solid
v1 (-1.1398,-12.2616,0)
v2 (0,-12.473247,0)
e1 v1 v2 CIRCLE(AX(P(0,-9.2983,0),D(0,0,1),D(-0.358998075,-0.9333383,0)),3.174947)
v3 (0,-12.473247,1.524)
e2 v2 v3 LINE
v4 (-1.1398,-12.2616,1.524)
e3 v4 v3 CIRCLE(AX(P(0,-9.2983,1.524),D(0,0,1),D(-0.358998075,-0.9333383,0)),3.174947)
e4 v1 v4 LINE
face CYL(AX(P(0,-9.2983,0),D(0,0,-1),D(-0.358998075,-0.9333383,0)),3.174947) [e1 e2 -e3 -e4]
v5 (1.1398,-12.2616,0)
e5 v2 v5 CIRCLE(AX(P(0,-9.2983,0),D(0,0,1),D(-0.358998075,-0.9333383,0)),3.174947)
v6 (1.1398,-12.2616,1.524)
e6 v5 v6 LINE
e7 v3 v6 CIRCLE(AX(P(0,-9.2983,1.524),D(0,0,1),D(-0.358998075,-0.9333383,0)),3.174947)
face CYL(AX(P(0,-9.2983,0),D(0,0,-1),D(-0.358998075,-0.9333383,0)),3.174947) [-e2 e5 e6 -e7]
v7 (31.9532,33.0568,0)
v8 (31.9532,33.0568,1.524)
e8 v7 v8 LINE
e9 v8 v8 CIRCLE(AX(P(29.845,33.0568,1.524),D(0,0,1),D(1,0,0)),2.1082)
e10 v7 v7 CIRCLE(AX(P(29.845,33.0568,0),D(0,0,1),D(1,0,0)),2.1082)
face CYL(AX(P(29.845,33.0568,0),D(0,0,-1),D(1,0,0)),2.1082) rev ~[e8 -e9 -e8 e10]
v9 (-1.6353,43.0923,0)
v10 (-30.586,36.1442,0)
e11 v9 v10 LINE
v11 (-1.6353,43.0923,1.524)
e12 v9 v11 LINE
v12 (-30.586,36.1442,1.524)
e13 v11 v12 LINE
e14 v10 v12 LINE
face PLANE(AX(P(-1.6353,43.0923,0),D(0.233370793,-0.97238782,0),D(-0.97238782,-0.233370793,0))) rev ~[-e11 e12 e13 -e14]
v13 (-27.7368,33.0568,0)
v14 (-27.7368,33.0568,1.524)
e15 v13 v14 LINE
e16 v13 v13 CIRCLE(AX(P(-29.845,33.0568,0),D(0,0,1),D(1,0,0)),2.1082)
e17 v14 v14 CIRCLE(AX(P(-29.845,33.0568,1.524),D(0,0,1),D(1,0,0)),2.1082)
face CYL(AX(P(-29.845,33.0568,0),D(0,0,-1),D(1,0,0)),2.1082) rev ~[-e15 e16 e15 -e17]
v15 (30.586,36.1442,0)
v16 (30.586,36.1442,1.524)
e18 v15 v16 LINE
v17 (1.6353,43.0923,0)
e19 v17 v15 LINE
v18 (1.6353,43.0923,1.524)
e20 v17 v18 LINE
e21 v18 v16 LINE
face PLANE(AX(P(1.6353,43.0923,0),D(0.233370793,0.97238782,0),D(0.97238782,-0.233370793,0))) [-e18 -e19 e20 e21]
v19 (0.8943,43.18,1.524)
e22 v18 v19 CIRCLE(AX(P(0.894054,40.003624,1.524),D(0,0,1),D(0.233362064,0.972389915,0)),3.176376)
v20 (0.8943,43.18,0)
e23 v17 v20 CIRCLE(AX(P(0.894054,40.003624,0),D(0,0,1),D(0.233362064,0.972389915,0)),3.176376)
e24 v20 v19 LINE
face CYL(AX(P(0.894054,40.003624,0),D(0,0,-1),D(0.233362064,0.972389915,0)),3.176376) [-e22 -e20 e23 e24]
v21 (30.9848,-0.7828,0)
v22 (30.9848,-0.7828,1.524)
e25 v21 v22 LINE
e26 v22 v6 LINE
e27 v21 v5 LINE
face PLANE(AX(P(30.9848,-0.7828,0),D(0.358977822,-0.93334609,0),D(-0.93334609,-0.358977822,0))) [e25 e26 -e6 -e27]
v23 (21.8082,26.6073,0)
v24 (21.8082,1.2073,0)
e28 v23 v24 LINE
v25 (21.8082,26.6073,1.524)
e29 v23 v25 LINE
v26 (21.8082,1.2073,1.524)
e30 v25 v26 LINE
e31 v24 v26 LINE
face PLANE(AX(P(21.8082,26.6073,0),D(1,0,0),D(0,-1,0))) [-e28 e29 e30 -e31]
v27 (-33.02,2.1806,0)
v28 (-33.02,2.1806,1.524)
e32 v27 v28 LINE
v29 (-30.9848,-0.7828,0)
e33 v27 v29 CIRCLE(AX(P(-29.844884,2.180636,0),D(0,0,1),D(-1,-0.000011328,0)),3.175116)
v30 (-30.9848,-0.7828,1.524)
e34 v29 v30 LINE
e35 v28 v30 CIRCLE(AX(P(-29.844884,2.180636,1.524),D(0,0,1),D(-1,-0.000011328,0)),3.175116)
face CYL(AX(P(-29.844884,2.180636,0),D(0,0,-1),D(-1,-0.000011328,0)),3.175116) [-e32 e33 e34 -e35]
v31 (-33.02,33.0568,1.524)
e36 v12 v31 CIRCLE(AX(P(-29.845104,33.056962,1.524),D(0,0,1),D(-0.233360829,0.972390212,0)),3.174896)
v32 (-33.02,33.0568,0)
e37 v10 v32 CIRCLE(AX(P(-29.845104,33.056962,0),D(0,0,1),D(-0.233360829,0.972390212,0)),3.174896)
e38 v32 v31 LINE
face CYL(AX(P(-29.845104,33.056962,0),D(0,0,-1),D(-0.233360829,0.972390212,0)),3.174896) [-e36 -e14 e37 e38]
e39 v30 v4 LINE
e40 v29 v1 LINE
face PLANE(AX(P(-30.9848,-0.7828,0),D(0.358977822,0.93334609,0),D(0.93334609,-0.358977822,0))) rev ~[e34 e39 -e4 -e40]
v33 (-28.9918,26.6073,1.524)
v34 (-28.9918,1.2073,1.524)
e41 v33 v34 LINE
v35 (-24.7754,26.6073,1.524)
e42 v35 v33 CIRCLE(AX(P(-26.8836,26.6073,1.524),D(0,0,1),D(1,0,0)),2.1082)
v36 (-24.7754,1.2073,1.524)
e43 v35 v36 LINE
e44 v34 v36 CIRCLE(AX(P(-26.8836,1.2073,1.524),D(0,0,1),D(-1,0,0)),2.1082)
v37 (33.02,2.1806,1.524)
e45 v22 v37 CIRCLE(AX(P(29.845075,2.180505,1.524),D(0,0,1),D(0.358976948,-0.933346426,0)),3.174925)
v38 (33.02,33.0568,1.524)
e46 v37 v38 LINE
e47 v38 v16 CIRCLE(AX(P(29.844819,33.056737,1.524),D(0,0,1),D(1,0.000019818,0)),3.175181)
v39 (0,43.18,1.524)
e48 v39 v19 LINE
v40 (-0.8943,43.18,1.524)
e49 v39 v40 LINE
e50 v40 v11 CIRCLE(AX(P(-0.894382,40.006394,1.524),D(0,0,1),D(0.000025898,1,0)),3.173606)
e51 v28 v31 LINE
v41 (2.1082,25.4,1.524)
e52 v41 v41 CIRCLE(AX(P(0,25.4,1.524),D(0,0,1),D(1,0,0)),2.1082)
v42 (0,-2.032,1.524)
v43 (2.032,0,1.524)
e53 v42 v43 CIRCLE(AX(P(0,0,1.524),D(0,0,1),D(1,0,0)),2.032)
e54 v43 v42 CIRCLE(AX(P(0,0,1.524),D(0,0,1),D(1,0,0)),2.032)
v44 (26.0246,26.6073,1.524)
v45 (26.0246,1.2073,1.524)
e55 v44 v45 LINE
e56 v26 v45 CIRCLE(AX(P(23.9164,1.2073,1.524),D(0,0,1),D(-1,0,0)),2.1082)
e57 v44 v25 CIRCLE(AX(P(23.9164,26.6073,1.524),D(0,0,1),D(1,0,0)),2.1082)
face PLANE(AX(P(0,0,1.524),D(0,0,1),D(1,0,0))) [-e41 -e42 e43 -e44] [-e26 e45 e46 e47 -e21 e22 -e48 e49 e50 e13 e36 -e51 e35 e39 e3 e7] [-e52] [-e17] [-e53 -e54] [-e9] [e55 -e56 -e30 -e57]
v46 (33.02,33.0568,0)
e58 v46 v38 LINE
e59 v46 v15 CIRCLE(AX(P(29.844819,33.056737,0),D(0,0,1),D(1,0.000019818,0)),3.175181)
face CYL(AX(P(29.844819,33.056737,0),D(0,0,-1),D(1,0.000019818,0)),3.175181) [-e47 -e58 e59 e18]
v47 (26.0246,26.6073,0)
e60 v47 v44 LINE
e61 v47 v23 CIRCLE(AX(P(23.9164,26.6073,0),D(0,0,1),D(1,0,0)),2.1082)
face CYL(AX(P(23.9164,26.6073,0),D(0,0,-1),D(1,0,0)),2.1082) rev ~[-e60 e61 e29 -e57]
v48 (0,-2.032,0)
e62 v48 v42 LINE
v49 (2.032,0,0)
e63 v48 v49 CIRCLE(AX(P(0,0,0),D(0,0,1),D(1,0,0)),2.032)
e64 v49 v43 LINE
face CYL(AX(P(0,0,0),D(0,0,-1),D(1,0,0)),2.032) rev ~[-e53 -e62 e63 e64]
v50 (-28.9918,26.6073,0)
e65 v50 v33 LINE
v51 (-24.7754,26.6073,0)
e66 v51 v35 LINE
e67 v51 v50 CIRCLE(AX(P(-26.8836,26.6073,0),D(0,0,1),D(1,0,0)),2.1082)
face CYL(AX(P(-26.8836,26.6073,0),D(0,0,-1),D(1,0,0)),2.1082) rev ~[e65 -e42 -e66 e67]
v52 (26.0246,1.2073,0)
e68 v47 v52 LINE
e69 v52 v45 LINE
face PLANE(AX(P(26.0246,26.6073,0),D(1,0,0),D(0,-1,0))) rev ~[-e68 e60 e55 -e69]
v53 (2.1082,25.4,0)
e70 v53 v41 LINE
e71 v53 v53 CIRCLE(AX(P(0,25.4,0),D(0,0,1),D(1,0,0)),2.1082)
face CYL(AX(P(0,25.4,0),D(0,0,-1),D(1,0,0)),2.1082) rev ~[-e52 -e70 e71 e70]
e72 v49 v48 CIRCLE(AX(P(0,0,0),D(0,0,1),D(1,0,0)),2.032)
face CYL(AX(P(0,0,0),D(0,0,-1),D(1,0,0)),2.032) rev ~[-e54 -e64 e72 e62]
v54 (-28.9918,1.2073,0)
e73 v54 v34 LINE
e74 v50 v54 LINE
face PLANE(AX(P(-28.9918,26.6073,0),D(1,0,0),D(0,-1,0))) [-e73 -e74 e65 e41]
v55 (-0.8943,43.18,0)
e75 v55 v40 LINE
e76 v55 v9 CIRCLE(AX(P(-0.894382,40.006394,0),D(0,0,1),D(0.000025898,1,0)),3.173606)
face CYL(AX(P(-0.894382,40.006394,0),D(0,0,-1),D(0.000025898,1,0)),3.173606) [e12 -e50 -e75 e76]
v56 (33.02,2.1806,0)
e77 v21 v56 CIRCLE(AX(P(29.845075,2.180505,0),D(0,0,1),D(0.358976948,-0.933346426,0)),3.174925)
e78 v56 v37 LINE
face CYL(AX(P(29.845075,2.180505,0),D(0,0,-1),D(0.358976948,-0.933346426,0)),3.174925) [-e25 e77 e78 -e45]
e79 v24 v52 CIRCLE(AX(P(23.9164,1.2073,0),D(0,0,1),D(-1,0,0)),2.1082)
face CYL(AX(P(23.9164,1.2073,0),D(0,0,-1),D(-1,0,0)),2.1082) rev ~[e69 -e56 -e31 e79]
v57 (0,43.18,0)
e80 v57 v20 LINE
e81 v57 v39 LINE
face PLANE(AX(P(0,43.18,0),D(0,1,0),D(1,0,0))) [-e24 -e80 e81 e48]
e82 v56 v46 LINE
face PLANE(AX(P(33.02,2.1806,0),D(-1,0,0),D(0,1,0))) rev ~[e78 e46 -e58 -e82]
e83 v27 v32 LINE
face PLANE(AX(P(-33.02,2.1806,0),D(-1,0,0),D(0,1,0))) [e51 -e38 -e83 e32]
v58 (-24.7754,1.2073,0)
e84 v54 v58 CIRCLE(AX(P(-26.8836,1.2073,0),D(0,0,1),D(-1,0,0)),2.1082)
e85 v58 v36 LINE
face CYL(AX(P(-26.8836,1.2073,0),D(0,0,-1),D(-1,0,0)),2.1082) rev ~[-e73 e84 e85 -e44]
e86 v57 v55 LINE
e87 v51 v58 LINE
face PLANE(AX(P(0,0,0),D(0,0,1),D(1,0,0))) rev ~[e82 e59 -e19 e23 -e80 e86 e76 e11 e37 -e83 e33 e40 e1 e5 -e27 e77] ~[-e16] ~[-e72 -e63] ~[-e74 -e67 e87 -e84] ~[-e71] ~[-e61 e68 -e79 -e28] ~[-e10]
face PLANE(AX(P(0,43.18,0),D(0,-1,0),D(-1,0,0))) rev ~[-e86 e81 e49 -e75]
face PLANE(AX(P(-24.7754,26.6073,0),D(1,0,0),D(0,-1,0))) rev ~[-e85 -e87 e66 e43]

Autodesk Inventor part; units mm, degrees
ref_plane "YZ Plane" through (0, 0, 0) normal (1, 0, 0) x (0, 1, 0)
ref_plane "XZ Plane" through (0, 0, 0) normal (0, 1, 0) x (-1, 0, 0)
ref_plane "XY Plane" through (0, 0, 0) normal (0, 0, 1) x (1, 0, 0)
sketch "Sketch1" plane through (0, 0, 0) normal (0, 0, 1) x (1, 0, 0)
  circle A0 centre (0, 0) radius 2.032 projected
  circle A1 centre (0, 25.4) radius 2.1082
  line L0 (26.0246, 26.6073) -> (26.0246, 1.2073)
  line L1 (21.8082, 26.6073) -> (21.8082, 1.2073)
  arc A2 (26.0246, 26.6073) -> (21.8082, 26.6073) centre (23.9164, 26.6073) ccw
  arc A3 (21.8082, 1.2073) -> (26.0246, 1.2073) centre (23.9164, 1.2073) ccw
  line L2 (-33.02, 2.1806) -> (-33.02, 33.0568)
  line L3 (33.02, 2.1806) -> (33.02, 33.0568)
  line L4 (0, 43.18) -> (0.8943, 43.18)
  line L5 (0, 43.18) -> (-0.8943, 43.18)
  line L6 (1.6353, 43.0923) -> (30.586, 36.1442)
  line L7 (-1.6353, 43.0923) -> (-30.586, 36.1442)
  line L8 (0, 0) -> (0, -12.7)
  line L9 (-30.9848, -0.7828) -> (-1.1398, -12.2616)
  line L10 (30.9848, -0.7828) -> (1.1398, -12.2616)
  arc A4 (-30.586, 36.1442) -> (-33.02, 33.0568) centre (-29.845, 33.0568) ccw
  arc A5 (-0.8943, 43.18) -> (-1.6353, 43.0923) centre (-0.8943, 40.005) ccw
  arc A6 (1.6353, 43.0923) -> (0.8943, 43.18) centre (0.8943, 40.005) ccw
  arc A7 (33.02, 33.0568) -> (30.586, 36.1442) centre (29.845, 33.0568) ccw
  arc A8 (30.9848, -0.7828) -> (33.02, 2.1806) centre (29.845, 2.1806) ccw
  arc A9 (-1.1398, -12.2616) -> (1.1398, -12.2616) centre (0, -9.2983) ccw
  arc A10 (-33.02, 2.1806) -> (-30.9848, -0.7828) centre (-29.845, 2.1806) ccw
  line L11 (-24.7754, 26.6073) -> (-24.7754, 1.2073)
  line L12 (-28.9918, 26.6073) -> (-28.9918, 1.2073)
  arc A11 (-24.7754, 26.6073) -> (-28.9918, 26.6073) centre (-26.8836, 26.6073) ccw
  arc A12 (-28.9918, 1.2073) -> (-24.7754, 1.2073) centre (-26.8836, 1.2073) ccw
  circle A13 centre (-29.845, 33.0568) radius 2.1082
  circle A14 centre (29.845, 33.0568) radius 2.1082
  point P0 (0, 0)
  point P1 (-33.02, 0)
  point P2 (33.02, 0)
  point P3 (-33.02, 35.56)
  point P4 (1.27, 43.18)
  point P5 (-1.27, 43.18)
  dimension "d1" = 4.2164
  dimension "d10" = 33.02
  dimension "d11" = 33.02
  dimension "d12" = 43.18
  dimension "d13" = 35.56
  dimension "d14" = 1.27
  dimension "d15" = 1.27
  dimension "d16" = 12.7
  dimension "d17" = 3.175
  dimension "d37" = 2.1082
  dimension "d38" = 25.4
  dimension "d39" = 4.2164
  dimension "d41" = 2.1082
  dimension "d43" = 4.2164
  dimension "d44" = 4.2164
  dimension "d45" = 4.2164
extrude "Extrusion3" add sketch "Sketch1" along normal blind 1.524
equation "\"d1\" = d43"
equation "\"d39\" = 2 * d37"
equation "\"d41\" = d37"
equation "\"d43\" = d39"
